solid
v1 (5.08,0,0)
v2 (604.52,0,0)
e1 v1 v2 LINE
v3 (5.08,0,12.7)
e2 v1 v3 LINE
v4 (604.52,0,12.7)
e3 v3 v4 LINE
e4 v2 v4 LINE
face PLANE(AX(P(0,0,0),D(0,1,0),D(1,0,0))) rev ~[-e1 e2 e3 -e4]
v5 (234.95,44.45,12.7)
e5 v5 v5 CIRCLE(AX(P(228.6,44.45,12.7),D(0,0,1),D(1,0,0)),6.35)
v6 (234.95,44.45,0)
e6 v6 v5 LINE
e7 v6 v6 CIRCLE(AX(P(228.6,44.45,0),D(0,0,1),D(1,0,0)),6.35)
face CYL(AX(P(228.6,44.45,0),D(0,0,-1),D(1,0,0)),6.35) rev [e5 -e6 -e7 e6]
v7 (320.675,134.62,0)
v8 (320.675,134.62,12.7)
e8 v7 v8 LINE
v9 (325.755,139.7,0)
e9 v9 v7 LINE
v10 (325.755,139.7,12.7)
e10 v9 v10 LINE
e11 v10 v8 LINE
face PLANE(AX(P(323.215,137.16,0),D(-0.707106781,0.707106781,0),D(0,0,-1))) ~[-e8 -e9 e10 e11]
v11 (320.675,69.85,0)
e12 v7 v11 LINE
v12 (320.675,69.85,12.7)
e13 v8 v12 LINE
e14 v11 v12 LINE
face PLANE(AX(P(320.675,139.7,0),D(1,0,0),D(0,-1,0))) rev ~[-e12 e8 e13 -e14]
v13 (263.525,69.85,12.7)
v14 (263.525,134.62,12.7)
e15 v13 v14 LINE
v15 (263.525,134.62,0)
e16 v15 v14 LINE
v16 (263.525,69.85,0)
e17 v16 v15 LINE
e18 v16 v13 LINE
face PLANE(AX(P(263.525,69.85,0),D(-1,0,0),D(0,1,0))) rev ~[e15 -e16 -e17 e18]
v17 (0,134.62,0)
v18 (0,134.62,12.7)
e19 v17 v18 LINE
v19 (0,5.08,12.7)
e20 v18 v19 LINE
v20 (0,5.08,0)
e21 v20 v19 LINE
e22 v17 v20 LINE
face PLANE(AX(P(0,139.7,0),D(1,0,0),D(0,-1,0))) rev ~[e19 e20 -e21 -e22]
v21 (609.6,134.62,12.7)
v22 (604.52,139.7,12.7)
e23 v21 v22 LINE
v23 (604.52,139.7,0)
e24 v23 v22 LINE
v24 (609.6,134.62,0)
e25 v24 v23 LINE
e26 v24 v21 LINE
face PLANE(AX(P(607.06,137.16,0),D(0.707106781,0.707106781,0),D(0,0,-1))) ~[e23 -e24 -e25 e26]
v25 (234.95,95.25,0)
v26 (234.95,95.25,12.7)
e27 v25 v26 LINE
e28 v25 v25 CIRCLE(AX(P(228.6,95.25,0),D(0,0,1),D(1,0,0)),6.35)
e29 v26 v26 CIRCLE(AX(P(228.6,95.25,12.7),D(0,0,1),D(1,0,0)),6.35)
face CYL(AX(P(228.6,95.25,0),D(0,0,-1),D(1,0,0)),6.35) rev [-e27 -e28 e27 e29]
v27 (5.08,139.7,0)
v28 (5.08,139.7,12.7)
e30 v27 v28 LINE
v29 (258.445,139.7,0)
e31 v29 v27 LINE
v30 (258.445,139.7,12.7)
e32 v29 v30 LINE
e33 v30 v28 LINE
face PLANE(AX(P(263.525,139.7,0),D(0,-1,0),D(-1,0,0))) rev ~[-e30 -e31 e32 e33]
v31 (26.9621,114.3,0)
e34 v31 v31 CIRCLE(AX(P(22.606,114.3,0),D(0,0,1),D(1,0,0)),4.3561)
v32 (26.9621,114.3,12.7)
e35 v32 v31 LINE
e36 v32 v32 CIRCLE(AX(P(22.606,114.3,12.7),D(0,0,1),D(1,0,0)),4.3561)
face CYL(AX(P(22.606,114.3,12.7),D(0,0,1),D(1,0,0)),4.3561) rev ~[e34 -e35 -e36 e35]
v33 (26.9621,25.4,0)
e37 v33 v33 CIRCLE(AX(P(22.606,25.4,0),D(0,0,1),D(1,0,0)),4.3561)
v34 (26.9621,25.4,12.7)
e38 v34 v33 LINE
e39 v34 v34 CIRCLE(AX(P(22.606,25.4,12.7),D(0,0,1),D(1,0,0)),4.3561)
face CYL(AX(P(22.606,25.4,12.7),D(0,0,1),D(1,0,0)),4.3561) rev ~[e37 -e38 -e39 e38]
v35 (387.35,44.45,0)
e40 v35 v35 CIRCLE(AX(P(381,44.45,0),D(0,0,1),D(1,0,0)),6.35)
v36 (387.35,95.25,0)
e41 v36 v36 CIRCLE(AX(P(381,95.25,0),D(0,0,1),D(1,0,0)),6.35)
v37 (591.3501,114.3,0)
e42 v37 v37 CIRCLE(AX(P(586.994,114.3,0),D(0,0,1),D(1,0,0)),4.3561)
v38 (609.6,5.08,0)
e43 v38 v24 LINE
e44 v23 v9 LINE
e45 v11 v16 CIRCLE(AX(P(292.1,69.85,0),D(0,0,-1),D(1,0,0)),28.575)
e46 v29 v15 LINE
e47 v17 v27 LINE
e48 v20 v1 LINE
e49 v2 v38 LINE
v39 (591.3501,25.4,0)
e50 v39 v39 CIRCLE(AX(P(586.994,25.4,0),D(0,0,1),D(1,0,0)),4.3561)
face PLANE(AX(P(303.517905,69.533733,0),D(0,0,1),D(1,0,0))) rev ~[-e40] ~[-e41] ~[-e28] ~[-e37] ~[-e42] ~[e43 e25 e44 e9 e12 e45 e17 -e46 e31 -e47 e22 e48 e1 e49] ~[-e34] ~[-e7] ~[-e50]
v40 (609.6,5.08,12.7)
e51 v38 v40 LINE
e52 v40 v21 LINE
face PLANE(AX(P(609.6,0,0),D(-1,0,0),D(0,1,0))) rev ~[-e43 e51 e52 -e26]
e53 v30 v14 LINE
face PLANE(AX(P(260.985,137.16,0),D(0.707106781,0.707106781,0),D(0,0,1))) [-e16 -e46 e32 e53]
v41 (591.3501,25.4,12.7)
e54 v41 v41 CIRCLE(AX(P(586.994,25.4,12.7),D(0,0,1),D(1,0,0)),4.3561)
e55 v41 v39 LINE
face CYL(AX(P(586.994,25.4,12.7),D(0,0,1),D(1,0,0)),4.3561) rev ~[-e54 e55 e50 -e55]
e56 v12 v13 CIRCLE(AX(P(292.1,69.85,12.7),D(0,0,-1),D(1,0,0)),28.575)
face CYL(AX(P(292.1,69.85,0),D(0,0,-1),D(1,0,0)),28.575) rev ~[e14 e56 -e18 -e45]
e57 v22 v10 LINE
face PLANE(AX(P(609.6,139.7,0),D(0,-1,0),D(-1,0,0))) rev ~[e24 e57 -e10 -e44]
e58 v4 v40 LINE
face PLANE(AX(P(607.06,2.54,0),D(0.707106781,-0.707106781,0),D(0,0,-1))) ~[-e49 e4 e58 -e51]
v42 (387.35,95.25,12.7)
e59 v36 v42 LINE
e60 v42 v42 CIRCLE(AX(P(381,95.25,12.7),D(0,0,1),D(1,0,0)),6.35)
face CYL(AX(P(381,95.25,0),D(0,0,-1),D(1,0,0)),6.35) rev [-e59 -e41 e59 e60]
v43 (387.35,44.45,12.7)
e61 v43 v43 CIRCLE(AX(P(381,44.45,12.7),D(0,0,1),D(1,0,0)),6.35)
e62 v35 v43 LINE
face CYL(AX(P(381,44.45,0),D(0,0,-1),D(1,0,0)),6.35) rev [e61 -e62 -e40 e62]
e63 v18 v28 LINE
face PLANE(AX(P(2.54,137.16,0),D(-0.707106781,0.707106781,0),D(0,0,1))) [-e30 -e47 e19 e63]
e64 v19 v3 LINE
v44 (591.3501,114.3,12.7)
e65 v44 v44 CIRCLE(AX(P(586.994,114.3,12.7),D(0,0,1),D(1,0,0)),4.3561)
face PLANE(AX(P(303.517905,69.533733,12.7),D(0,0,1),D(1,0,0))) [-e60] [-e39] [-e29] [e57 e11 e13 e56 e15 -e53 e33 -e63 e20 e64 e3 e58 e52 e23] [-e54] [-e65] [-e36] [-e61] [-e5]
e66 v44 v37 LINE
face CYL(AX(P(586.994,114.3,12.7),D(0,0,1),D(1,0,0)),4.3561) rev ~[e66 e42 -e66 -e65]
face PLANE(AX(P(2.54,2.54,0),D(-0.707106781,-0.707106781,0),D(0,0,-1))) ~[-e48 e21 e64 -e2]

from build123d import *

# Parameters (mm, degrees)
F0_R     = 6.35
F1_DEPTH = 12.7
F2_SIZE  = 5.08
F3_R     = 4.3561
F4_DEPTH = 12.701


with BuildPart() as f1:
    # F0 (on Top) → F1 (new body)
    with BuildSketch(Plane.XY):
        with BuildLine():
            Line((0, 139.7), (0, 0))
            Line((0, 0), (609.6, 0))
            Line((609.6, 0), (609.6, 139.7))
            Line((609.6, 139.7), (333.375, 139.7))
            Line((333.375, 139.7), (320.675, 139.7))
            Line((320.675, 139.7), (320.675, 69.85))
            ThreePointArc((320.675, 69.85), (292.1, 41.275), (263.525, 69.85))
            Line((263.525, 69.85), (263.525, 139.7))
            Line((263.525, 139.7), (0, 139.7))
        make_face()
        with Locations((228.6, 44.45)):
            Circle(F0_R, mode=Mode.SUBTRACT)
        with Locations((381, 44.45)):
            Circle(F0_R, mode=Mode.SUBTRACT)
        with Locations((228.6, 95.25)):
            Circle(F0_R, mode=Mode.SUBTRACT)
        with Locations((381, 95.25)):
            Circle(F0_R, mode=Mode.SUBTRACT)
    extrude(amount=F1_DEPTH)

    # F2
    f2_edges = [f1.edges().sort_by_distance(p)[0] for p in [
        (320.675, 139.7, 6.35),
        (0, 0, 6.35),
        (0, 139.7, 6.35),
        (263.525, 139.7, 6.35),
        (609.6, 139.7, 6.35),
        (609.6, 0, 6.35),
    ]]
    chamfer(f2_edges, length=F2_SIZE)

    # F3 (on face) → F4 (cut, through all)
    with BuildSketch(Plane.XY.offset(12.7)):
        with Locations((22.606, 114.3)):
            Circle(F3_R)
        with Locations((22.606, 25.4)):
            Circle(F3_R)
        with Locations((586.994, 25.4)):
            Circle(F3_R)
        with Locations((586.994, 114.3)):
            Circle(F3_R)
    extrude(amount=-F4_DEPTH, mode=Mode.SUBTRACT)


solid = f1.part
